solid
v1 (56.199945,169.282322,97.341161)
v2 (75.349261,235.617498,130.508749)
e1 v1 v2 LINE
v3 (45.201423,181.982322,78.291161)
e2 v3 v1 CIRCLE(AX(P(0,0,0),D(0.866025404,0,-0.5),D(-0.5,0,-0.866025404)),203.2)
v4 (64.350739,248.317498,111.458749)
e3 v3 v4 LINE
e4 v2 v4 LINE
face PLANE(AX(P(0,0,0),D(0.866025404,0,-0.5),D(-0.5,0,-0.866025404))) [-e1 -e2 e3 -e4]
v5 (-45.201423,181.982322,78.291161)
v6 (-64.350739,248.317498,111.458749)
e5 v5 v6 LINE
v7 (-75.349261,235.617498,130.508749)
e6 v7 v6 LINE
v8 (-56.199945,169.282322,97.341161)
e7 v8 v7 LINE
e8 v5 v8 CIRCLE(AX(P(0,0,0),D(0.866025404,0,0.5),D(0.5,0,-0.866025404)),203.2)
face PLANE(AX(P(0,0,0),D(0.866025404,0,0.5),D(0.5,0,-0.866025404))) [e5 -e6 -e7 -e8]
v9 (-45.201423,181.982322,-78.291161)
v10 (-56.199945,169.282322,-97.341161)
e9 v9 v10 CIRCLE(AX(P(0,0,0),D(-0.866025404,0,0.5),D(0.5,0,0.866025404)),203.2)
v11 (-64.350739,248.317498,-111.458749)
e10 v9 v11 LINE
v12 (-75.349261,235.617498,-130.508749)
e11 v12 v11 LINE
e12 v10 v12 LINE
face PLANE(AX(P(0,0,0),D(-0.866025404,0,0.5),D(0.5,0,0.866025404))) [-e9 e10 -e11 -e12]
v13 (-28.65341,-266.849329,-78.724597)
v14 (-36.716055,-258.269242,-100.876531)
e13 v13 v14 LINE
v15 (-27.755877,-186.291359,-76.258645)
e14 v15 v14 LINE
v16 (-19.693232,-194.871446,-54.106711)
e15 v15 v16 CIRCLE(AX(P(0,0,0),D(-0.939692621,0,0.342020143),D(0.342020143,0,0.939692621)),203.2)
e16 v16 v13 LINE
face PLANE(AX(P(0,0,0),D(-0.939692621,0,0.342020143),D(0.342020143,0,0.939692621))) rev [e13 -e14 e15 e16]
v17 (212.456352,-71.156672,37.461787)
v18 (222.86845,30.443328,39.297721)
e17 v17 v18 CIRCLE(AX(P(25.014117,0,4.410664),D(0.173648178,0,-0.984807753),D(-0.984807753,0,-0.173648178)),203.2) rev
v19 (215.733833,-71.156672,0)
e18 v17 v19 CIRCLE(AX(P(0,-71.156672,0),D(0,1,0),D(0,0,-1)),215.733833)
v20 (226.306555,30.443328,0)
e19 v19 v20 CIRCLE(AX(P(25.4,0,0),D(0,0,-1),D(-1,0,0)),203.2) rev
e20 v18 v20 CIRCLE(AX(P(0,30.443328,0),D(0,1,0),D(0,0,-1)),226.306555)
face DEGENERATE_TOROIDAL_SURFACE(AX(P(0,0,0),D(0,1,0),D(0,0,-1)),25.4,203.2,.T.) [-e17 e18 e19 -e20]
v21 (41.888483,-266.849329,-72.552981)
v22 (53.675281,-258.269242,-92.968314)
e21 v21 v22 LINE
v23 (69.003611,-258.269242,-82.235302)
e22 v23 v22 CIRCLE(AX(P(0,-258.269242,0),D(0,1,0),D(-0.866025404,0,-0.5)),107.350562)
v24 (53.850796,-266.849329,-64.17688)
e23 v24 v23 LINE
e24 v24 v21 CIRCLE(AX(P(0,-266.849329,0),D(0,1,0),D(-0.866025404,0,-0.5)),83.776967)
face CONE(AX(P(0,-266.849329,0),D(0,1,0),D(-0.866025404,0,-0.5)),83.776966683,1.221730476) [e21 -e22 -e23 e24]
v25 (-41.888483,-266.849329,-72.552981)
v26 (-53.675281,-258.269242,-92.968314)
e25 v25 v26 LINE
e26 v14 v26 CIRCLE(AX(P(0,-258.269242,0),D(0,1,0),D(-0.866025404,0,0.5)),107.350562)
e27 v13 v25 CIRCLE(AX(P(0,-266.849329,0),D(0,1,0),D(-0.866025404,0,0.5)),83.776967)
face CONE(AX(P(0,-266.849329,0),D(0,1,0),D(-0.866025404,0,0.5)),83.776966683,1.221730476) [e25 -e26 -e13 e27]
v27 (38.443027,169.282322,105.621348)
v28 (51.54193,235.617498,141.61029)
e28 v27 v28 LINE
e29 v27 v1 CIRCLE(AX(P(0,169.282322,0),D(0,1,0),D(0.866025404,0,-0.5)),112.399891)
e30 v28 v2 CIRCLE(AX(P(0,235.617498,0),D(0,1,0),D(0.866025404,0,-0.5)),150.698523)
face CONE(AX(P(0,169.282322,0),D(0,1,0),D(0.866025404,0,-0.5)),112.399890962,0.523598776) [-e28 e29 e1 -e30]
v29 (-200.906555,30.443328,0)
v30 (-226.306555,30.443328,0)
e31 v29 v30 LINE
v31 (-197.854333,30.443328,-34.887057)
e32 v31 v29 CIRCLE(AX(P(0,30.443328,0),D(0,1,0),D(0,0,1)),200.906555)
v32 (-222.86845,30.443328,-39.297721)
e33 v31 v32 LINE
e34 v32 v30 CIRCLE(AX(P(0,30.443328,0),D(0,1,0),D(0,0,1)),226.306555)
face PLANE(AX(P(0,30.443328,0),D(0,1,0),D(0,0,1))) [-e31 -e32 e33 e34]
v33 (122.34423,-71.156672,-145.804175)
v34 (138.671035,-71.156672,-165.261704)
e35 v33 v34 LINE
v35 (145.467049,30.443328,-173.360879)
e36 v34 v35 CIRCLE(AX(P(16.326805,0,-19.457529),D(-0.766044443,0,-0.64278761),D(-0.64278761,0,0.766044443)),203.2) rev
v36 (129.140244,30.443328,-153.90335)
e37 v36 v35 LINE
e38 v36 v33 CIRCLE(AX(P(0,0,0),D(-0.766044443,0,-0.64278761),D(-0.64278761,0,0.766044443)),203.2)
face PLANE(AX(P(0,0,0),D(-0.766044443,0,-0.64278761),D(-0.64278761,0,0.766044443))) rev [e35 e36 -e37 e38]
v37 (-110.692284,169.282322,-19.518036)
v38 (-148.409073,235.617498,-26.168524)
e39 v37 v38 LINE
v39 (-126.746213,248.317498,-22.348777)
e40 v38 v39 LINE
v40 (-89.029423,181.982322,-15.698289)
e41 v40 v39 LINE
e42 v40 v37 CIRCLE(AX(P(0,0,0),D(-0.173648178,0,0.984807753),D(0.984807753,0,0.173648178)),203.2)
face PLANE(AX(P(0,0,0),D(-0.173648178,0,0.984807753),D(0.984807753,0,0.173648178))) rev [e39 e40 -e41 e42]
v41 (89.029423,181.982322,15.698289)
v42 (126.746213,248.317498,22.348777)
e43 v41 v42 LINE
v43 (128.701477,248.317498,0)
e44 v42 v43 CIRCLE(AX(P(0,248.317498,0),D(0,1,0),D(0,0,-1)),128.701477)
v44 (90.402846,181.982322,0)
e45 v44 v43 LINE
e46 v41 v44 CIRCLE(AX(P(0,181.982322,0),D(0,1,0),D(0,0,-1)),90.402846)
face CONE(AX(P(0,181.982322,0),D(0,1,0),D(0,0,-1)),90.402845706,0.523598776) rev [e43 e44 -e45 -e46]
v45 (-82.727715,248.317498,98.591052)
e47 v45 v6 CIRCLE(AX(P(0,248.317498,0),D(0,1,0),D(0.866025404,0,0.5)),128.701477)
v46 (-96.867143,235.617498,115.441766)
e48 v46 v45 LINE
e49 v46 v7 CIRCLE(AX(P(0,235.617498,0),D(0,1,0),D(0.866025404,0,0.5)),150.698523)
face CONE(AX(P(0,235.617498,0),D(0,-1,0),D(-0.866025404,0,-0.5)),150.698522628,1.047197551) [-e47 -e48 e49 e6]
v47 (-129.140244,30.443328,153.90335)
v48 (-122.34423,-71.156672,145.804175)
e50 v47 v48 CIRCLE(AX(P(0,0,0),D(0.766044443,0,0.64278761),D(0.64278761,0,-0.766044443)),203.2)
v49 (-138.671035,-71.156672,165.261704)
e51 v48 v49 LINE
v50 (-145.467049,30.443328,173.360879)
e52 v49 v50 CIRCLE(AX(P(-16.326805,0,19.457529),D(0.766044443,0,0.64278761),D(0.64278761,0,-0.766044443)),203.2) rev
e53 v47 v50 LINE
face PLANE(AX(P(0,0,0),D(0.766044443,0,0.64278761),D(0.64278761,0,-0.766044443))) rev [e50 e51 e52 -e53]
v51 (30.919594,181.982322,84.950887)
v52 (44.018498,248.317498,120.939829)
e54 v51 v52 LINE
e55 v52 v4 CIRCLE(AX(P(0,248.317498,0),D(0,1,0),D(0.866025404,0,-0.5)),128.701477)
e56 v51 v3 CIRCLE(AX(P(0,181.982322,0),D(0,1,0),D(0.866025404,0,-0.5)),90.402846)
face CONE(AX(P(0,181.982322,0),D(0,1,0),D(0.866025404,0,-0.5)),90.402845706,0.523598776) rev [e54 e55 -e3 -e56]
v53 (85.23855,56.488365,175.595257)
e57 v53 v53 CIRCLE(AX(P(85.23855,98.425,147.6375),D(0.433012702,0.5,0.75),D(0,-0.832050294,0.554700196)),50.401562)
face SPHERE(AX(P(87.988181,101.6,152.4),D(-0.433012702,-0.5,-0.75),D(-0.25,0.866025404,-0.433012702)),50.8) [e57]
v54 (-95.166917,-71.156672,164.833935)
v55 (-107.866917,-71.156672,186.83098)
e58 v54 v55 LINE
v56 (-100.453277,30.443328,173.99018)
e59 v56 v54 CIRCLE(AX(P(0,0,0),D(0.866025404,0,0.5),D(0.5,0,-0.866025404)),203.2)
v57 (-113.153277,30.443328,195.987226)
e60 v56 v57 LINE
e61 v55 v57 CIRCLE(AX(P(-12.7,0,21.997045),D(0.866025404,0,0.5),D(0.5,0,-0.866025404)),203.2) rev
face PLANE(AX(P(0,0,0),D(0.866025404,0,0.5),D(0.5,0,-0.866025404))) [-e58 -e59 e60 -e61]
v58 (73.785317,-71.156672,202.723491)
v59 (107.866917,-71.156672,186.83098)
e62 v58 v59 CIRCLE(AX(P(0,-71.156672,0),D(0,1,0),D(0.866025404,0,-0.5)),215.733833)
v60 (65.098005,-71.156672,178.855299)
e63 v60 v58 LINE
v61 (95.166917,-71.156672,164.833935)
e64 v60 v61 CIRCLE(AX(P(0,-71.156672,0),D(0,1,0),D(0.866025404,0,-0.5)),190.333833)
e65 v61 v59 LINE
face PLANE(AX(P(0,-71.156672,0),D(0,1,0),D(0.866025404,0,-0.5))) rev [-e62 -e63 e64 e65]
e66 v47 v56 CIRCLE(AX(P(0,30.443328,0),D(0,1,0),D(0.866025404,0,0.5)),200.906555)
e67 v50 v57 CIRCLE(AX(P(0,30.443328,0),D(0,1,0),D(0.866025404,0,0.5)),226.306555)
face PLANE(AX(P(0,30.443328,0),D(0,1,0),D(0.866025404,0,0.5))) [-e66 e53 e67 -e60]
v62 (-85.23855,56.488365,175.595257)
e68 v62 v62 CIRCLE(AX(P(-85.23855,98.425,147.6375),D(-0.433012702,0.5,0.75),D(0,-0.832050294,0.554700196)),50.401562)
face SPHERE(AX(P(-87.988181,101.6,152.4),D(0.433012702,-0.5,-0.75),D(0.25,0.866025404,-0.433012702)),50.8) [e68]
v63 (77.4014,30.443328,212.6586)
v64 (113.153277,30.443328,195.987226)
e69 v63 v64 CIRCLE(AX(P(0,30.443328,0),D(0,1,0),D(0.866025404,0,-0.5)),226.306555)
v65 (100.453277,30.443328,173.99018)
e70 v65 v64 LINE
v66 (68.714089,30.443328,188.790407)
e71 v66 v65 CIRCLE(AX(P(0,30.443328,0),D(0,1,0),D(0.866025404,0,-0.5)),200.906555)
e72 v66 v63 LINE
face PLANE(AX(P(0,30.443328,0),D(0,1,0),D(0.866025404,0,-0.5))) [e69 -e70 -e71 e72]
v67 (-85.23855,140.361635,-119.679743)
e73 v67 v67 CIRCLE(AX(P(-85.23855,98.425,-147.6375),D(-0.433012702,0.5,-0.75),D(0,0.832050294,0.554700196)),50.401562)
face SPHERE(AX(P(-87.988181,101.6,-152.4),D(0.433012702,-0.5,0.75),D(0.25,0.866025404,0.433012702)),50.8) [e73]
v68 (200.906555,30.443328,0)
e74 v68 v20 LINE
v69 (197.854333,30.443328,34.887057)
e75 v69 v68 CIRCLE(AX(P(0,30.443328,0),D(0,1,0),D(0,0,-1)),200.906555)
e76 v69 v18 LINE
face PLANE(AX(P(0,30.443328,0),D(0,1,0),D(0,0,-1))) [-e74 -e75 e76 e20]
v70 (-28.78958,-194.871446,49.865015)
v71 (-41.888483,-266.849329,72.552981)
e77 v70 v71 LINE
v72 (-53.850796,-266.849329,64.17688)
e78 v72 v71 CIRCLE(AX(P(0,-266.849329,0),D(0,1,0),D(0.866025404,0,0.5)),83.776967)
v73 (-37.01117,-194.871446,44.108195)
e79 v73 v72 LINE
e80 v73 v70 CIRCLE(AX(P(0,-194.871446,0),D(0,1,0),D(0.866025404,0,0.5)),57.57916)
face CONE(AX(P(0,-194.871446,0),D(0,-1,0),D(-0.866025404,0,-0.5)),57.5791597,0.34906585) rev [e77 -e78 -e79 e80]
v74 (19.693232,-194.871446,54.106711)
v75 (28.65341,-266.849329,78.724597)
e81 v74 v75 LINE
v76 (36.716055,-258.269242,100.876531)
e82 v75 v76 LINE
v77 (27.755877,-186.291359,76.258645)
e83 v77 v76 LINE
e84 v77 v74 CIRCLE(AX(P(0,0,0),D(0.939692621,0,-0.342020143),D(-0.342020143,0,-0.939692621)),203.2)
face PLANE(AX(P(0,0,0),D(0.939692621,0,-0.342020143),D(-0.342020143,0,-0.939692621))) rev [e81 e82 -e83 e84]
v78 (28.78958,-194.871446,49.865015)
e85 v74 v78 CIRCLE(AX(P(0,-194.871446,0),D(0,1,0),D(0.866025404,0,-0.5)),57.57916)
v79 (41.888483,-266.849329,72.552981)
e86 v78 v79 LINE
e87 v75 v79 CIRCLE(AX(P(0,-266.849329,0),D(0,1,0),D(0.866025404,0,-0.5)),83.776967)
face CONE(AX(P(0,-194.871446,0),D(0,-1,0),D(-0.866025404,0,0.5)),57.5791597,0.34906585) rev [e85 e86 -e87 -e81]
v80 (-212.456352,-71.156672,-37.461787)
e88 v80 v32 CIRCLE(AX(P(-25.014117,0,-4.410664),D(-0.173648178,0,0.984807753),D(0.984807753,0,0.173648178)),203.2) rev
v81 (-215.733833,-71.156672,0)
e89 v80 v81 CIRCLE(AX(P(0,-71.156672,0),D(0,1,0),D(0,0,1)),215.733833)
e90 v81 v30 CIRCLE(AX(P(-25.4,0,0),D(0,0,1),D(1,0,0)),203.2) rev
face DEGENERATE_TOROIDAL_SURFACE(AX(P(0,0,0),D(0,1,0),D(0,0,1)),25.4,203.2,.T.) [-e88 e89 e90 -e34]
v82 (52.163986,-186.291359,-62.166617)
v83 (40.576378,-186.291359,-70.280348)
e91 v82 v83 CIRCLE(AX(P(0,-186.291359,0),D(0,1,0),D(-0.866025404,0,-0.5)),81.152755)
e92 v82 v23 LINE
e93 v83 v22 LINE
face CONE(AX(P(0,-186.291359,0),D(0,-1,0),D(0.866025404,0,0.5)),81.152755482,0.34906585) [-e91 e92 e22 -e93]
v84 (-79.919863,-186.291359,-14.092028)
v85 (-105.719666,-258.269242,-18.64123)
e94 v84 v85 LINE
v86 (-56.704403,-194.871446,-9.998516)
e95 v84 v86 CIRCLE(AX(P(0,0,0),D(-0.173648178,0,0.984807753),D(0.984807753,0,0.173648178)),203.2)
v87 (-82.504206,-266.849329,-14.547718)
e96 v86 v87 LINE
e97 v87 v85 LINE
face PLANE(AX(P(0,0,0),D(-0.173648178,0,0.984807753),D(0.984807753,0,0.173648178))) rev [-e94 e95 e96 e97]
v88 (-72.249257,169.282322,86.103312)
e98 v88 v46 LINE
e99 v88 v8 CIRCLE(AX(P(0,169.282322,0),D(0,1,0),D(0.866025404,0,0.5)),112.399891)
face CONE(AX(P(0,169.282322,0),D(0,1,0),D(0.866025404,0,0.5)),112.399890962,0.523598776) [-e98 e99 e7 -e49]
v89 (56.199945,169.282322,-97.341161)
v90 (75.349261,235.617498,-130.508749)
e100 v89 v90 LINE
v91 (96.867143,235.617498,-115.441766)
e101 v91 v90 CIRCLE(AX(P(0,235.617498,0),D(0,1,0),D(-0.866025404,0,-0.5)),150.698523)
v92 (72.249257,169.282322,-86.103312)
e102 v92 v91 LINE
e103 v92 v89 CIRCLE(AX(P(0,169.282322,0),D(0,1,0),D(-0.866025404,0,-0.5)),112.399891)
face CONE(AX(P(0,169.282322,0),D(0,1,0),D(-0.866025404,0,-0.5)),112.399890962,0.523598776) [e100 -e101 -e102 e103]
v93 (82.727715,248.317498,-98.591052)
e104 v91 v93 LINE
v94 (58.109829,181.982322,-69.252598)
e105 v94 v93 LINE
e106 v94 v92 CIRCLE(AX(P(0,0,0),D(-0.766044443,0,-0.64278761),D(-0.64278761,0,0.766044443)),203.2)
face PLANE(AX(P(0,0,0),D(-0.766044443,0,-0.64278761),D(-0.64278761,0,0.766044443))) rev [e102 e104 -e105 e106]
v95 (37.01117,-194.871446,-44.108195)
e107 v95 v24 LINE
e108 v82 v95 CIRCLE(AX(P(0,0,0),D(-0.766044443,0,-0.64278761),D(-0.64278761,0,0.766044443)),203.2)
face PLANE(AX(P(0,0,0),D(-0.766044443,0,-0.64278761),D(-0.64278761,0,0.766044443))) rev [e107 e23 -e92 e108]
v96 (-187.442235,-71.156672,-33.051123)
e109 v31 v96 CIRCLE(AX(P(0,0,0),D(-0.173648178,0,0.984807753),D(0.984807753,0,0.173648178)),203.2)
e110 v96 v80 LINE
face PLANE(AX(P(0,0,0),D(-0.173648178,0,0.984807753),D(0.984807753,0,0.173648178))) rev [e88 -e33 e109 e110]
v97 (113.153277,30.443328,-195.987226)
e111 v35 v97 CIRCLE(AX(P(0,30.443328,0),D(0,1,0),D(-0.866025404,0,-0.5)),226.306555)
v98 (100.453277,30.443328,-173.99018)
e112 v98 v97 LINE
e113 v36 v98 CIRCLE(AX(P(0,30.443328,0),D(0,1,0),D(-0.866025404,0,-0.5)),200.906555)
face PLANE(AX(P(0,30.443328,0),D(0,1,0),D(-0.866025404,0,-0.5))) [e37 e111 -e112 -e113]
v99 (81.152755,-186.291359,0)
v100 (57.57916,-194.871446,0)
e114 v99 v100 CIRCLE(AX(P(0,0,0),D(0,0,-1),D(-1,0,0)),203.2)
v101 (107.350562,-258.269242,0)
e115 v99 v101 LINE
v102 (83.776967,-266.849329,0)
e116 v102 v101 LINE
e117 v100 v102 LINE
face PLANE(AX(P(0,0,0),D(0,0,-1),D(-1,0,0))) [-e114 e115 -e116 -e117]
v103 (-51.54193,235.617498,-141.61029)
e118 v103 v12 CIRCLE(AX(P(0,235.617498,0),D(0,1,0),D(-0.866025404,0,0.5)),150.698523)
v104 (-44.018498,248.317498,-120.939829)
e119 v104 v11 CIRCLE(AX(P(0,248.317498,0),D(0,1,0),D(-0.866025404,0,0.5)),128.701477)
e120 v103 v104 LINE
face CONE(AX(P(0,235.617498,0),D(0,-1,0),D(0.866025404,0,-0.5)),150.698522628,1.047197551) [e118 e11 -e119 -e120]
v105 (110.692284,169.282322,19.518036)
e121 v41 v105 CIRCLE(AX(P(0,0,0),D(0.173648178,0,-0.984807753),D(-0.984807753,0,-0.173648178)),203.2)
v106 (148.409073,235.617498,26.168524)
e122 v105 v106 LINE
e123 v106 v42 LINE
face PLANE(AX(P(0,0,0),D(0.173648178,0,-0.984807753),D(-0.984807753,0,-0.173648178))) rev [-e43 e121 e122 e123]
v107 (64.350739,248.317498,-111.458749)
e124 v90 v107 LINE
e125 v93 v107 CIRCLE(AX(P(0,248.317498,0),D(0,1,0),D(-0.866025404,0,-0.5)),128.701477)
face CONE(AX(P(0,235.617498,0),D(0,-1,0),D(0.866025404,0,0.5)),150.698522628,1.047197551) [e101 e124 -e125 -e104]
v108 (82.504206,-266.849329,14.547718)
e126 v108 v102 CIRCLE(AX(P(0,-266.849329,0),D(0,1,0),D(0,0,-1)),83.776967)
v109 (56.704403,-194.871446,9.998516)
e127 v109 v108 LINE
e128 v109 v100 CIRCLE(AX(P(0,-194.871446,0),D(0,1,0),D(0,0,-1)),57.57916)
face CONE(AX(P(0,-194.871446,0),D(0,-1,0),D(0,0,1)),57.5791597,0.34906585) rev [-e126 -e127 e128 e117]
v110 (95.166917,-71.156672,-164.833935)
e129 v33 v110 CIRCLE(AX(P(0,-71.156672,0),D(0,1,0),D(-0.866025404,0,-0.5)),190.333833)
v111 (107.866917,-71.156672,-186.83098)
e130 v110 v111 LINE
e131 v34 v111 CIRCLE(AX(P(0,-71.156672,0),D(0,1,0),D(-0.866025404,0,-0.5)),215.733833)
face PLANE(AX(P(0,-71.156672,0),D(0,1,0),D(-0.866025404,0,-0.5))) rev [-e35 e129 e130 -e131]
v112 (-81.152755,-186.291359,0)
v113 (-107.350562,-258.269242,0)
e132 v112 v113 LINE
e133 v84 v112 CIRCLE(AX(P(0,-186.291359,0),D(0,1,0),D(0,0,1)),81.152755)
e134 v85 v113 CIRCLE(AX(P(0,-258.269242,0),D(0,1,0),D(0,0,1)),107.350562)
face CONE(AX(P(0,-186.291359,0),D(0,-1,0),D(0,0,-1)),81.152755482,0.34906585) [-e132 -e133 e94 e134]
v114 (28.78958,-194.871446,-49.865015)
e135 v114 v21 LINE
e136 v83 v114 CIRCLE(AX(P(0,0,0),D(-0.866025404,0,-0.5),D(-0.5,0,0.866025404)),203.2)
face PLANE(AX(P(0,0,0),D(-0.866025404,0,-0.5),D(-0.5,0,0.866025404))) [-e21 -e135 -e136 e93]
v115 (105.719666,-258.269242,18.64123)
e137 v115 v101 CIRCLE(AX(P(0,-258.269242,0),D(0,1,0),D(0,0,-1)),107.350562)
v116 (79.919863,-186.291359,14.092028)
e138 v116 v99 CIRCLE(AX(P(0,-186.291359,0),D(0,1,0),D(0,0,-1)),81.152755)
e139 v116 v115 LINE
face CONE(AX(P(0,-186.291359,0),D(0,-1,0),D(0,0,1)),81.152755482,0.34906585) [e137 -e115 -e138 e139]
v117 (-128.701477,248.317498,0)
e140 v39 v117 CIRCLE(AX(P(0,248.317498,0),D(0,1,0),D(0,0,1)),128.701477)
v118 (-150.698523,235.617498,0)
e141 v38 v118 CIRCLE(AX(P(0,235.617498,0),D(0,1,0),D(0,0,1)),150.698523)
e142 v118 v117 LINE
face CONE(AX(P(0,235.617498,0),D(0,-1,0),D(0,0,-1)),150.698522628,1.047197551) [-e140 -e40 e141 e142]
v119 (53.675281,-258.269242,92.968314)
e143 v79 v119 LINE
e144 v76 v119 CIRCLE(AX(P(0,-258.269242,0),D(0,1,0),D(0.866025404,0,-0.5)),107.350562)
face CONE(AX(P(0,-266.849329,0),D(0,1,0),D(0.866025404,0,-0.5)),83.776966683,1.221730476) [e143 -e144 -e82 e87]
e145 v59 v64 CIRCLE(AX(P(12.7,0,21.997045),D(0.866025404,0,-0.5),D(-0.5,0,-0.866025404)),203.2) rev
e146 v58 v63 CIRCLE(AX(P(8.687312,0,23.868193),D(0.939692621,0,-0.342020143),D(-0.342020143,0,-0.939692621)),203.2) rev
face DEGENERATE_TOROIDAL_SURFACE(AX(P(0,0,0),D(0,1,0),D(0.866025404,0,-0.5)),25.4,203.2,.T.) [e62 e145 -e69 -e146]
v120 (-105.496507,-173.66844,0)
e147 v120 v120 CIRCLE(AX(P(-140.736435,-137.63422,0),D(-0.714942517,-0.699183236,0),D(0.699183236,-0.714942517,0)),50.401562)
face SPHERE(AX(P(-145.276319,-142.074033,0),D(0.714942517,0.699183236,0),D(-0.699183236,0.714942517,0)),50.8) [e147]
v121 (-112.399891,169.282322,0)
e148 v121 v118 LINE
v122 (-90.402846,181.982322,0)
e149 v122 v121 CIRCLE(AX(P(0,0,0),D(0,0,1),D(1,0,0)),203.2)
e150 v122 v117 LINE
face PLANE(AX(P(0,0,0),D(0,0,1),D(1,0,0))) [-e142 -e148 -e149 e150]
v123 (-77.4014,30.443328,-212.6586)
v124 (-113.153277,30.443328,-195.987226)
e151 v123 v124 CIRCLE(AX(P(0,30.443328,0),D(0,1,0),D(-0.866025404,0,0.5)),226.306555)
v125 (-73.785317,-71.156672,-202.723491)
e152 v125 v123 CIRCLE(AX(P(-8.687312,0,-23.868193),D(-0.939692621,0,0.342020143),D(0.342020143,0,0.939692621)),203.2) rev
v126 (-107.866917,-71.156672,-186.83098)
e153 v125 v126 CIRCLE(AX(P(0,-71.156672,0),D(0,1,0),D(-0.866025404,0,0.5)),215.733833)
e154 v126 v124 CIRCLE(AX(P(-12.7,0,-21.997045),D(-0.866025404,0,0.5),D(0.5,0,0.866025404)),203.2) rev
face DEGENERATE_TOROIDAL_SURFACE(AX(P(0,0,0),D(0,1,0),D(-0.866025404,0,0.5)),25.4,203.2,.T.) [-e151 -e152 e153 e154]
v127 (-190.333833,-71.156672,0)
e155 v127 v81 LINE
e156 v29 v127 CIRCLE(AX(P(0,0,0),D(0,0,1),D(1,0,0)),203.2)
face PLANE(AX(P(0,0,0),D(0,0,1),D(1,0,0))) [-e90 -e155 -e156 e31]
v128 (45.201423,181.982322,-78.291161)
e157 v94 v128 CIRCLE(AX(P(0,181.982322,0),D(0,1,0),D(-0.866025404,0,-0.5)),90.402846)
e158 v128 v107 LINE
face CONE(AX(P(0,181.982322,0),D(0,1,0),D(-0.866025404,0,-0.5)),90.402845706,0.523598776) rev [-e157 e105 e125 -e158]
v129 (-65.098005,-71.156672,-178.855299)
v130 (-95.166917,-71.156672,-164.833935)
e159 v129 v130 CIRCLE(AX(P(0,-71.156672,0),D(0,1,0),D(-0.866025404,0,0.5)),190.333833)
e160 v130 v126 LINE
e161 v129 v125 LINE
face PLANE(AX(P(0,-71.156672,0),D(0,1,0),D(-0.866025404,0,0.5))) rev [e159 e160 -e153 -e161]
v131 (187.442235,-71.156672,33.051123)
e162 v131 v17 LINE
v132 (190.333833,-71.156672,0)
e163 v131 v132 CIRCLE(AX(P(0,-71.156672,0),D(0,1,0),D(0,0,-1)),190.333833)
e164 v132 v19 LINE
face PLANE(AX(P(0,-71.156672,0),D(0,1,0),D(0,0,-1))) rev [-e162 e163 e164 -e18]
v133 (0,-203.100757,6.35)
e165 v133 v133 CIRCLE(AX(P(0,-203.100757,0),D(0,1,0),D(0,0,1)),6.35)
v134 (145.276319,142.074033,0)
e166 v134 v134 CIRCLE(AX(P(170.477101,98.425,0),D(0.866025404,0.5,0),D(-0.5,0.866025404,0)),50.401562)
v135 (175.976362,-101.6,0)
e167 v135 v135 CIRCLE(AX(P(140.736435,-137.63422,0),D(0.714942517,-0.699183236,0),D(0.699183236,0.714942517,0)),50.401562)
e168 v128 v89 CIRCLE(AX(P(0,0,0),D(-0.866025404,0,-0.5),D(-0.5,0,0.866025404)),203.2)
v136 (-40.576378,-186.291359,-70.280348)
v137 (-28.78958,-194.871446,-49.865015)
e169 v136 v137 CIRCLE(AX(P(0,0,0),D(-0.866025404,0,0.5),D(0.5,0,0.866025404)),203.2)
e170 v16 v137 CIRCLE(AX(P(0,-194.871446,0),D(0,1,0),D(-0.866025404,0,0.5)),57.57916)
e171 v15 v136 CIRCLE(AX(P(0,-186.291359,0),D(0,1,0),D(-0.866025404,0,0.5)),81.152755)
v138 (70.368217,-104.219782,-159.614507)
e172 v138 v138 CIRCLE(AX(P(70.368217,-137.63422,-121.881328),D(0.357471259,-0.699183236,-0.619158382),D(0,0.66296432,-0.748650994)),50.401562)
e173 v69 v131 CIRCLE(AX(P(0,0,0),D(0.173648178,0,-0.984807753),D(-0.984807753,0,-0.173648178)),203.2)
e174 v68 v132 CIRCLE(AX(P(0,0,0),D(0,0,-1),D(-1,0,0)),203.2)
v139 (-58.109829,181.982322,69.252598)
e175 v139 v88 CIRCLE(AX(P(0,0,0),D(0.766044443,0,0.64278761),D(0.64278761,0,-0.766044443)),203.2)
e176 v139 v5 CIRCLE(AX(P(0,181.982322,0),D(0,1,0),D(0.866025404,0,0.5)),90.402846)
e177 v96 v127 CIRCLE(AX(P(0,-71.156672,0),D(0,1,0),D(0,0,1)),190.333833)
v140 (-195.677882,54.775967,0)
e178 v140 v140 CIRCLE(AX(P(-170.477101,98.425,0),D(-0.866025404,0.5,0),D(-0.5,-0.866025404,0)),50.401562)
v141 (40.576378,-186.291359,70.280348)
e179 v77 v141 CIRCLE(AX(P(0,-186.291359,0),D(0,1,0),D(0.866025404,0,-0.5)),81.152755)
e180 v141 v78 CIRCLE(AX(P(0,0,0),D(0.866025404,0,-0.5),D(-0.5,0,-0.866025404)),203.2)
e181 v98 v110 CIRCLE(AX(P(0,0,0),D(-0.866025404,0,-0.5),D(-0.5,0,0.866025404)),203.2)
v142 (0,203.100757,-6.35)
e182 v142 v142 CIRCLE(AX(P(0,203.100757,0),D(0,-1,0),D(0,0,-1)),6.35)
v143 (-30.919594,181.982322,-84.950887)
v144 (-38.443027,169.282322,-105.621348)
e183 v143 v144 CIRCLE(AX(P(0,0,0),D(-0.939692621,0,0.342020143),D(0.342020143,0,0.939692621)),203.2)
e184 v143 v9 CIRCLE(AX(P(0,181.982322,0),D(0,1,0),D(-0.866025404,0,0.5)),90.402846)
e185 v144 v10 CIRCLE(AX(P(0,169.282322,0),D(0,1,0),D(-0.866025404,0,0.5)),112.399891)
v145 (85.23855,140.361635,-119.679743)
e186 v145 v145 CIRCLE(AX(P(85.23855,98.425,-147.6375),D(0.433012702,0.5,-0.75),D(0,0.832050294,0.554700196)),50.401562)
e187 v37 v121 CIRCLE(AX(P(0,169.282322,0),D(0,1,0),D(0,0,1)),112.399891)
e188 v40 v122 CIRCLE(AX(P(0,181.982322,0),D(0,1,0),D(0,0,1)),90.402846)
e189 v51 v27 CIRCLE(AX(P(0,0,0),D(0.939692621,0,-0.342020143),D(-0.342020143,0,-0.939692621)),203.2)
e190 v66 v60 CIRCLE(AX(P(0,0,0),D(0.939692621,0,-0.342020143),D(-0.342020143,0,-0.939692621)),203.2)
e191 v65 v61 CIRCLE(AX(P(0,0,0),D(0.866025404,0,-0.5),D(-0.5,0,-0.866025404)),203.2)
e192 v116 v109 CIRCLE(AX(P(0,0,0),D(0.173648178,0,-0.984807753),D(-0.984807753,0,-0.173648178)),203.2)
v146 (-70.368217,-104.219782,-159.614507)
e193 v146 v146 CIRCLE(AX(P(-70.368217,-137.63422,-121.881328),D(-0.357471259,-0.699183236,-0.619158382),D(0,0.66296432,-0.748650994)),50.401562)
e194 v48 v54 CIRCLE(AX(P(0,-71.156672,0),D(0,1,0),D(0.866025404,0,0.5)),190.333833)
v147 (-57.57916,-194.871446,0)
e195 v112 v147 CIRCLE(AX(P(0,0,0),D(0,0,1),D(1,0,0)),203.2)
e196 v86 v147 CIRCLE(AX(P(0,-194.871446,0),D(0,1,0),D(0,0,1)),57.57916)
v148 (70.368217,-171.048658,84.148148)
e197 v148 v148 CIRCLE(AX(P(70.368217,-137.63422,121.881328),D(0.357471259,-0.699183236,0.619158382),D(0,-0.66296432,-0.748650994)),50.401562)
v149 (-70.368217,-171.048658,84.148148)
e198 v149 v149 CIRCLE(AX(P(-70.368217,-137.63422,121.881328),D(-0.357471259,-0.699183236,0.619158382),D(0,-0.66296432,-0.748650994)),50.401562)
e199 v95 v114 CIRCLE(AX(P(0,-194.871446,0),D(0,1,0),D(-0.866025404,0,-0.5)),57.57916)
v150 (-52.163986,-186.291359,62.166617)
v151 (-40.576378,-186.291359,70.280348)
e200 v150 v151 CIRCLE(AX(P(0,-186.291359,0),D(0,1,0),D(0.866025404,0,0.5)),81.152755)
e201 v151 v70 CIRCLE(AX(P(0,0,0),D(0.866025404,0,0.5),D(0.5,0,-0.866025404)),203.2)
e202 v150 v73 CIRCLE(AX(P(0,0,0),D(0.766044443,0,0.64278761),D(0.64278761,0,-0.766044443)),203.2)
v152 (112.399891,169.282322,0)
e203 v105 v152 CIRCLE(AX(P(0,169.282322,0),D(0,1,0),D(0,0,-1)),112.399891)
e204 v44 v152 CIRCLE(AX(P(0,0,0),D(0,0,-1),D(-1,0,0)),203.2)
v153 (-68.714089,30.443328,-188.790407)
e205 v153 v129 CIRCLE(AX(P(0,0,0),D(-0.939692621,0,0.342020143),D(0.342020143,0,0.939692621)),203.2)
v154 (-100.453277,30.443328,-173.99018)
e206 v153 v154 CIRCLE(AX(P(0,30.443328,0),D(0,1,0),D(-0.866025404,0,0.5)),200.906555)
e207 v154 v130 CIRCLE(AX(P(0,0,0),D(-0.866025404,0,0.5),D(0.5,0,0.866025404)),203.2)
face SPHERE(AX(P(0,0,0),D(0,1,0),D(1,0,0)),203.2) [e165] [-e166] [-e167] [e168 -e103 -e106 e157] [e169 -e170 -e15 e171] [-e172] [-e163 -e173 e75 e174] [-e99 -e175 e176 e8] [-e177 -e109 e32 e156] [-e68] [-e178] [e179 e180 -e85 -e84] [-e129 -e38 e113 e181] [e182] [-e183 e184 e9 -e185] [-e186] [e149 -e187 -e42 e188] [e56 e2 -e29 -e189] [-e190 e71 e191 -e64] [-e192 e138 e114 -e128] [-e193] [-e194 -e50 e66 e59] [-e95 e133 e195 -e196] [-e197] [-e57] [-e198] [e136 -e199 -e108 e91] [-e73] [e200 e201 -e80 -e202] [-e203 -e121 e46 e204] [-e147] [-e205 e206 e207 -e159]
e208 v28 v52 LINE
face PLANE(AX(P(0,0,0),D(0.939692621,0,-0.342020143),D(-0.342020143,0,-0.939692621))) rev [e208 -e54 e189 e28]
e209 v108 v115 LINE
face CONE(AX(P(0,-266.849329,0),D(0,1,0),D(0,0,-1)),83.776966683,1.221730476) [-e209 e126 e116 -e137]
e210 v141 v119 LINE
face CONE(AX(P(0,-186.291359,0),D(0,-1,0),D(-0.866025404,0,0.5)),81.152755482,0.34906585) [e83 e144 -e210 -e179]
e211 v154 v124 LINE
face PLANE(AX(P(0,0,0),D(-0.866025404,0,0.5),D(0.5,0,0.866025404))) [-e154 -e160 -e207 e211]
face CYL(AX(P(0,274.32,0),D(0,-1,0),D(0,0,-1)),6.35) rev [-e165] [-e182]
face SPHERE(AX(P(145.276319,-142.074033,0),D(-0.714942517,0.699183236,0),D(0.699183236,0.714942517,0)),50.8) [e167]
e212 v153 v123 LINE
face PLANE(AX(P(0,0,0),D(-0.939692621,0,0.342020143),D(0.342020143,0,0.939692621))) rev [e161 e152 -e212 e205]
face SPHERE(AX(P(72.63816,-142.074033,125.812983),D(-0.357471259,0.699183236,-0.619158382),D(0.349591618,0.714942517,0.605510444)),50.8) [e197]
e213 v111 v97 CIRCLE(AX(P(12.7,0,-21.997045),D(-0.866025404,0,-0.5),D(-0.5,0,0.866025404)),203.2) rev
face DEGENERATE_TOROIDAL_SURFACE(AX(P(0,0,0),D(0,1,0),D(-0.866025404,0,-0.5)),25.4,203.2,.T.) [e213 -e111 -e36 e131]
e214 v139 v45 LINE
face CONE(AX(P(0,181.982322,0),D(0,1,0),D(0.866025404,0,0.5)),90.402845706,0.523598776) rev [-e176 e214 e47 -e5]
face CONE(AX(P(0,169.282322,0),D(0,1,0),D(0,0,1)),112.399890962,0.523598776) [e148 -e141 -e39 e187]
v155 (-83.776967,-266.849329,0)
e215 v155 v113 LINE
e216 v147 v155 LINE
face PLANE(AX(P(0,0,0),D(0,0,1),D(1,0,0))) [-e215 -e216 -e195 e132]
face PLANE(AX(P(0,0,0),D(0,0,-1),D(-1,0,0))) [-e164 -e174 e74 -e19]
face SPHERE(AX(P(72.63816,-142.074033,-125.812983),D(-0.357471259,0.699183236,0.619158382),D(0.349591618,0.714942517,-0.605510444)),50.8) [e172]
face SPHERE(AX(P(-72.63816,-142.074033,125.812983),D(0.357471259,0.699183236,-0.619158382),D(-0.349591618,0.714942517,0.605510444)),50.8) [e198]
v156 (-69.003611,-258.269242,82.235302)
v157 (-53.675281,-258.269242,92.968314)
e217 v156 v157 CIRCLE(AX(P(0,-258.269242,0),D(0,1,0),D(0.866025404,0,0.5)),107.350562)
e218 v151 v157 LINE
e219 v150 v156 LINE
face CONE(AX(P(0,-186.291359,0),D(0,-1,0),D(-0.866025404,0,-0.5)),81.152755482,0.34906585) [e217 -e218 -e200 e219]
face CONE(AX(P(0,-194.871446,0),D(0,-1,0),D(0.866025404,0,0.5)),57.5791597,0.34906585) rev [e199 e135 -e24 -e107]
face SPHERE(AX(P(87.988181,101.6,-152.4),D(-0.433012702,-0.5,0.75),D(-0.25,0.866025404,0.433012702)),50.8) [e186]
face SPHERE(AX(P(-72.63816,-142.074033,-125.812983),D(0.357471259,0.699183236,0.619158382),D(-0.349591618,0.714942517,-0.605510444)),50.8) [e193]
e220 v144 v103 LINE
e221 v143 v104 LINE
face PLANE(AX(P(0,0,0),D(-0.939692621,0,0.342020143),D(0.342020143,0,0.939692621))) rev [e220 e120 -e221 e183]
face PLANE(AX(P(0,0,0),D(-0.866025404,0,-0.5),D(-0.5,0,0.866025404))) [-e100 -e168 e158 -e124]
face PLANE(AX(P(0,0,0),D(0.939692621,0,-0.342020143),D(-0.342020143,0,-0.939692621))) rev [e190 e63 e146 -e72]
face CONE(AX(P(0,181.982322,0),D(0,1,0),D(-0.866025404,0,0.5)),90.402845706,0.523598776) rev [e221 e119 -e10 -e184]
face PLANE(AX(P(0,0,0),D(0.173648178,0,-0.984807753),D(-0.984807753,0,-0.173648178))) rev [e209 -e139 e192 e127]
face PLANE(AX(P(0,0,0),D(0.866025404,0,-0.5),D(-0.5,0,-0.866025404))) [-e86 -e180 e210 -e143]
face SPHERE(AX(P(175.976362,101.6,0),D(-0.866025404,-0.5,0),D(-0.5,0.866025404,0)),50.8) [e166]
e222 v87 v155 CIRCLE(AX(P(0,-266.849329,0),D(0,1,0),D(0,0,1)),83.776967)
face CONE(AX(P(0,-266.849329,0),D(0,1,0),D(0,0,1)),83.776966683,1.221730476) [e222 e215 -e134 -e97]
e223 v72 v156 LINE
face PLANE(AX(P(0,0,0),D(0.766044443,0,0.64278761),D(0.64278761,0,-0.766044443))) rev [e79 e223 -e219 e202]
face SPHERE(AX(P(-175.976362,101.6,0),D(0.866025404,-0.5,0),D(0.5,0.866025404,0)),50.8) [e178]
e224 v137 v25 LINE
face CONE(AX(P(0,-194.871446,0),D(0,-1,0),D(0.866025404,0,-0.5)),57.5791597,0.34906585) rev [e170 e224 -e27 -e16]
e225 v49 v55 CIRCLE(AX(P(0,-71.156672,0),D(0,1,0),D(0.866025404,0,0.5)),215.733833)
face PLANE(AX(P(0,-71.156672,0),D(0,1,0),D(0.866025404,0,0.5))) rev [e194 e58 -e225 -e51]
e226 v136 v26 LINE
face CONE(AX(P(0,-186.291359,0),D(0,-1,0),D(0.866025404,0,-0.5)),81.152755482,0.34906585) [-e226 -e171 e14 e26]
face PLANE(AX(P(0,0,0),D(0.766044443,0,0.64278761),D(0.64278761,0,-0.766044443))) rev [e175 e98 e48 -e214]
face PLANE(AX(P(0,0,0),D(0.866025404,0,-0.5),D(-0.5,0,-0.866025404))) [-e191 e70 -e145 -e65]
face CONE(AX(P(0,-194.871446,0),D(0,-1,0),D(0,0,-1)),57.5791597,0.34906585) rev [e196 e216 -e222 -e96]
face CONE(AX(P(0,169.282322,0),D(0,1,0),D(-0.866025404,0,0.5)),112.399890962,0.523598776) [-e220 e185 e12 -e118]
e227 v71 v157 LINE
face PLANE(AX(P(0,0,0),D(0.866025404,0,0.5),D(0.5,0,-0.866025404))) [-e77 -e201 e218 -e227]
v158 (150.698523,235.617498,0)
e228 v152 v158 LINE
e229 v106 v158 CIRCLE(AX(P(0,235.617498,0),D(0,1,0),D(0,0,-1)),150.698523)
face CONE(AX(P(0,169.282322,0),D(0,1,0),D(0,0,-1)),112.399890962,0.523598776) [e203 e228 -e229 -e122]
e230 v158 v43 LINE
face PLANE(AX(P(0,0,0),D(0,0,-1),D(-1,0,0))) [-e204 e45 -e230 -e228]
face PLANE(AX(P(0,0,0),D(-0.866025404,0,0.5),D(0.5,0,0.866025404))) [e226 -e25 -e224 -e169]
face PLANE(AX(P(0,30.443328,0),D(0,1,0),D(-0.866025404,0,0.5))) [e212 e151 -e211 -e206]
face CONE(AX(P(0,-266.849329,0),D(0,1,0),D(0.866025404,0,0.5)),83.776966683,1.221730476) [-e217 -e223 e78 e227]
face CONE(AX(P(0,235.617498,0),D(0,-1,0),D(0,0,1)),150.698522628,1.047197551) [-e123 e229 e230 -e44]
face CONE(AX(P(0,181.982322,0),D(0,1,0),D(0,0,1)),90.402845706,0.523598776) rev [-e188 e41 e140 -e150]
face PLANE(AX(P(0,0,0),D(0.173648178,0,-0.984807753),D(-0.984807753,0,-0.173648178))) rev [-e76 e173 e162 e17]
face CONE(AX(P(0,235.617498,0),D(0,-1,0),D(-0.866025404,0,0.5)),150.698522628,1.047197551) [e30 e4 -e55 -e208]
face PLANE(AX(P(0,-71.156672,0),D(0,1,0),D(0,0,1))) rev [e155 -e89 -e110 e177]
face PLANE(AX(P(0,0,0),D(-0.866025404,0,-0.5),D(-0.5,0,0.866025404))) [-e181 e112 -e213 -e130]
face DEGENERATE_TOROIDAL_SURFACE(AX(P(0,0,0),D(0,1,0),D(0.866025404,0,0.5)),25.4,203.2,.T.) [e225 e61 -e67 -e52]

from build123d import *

# Parameters (mm, degrees)
CUT_EXTRUDE1_DEPTH      = 274.32
CUT_EXTRUDE1_DEPTH_BACK = 255.524
SKETCH2_R               = 6.35
REVOLVE2_ANGLE          = 10
CIRPATTERN1_COUNT       = 6


with BuildPart() as part:
    # Sketch1 → Revolve1 (revolve)
    with BuildSketch(Plane.XY):
        with BuildLine():
            Line((0, -203.2), (0, 203.2))
            ThreePointArc((0, 203.2), (-46.429689788, 197.82447752), (-90.402845706, 181.982321911))
            ThreePointArc((-90.402845706, 181.982321911), (-101.6, 175.976362049), (-112.399890962, 169.282321911))
            ThreePointArc((-112.399890962, 169.282321911), (-129.55435191, 156.543635774), (-145.276319497, 142.074033494))
            ThreePointArc((-145.276319497, 142.074033494), (-161.896133978, 122.800170208), (-175.976362049, 101.6))
            ThreePointArc((-175.976362049, 101.6), (-187.296133978, 78.806079695), (-195.677881973, 54.775966506))
            ThreePointArc((-195.677881973, 54.775966506), (-198.665103115, 42.689774003), (-200.906554809, 30.443328247))
            ThreePointArc((-200.906554809, 30.443328247), (-202.108634909, -21.031873321), (-190.333833211, -71.156671753))
            ThreePointArc((-190.333833211, -71.156671753), (-183.786530645, -86.676127933), (-175.976362049, -101.6))
            ThreePointArc((-175.976362049, -101.6), (-161.896133978, -122.800170208), (-145.276319497, -142.074033494))
            ThreePointArc((-145.276319497, -142.074033494), (-126.377625604, -159.119250082), (-105.496506977, -173.668439896))
            ThreePointArc((-105.496506977, -173.668439896), (-93.537806864, -180.391016093), (-81.152755482, -186.29135857))
            ThreePointArc((-81.152755482, -186.29135857), (-69.498493124, -190.945540544), (-57.5791597, -194.871445749))
            ThreePointArc((-57.5791597, -194.871445749), (-29.089192356, -201.107083138), (0, -203.2))
        make_face()
    revolve(axis=Axis((0, 203.2, 0), (0, -1, 0)))

    # Sketch2 → Cut-Extrude1 (cut, two sides: drawn at the far end of the back side and taken through both)
    with BuildSketch(Plane(origin=(0, 0, 0), x_dir=(1, 0, 0), z_dir=(0, 1, 0)).offset(-CUT_EXTRUDE1_DEPTH_BACK)):
        Circle(SKETCH2_R)
    extrude(amount=CUT_EXTRUDE1_DEPTH + CUT_EXTRUDE1_DEPTH_BACK, mode=Mode.SUBTRACT)

    # Sketch1<4> → Revolve2 (revolve)
    with BuildSketch(Plane.XY):
        with BuildLine():
            ThreePointArc((-112.399890962, 169.282321911), (-101.6, 175.976362049), (-90.402845706, 181.982321911))
            Line((-90.402845706, 181.982321911), (-128.701477372, 248.317497817))
            Line((-128.701477372, 248.317497817), (-150.698522628, 235.617497817))
            Line((-150.698522628, 235.617497817), (-112.399890962, 169.282321911))
        make_face()
        with BuildLine():
            Line((-83.776966683, -266.849328874), (-57.5791597, -194.871445749))
            ThreePointArc((-57.5791597, -194.871445749), (-69.498493124, -190.945540544), (-81.152755482, -186.29135857))
            Line((-81.152755482, -186.29135857), (-107.350562465, -258.269241695))
            Line((-107.350562465, -258.269241695), (-83.776966683, -266.849328874))
        make_face()
        with BuildLine():
            ThreePointArc((-190.333833211, -71.156671753), (-202.108634909, -21.031873321), (-200.906554809, 30.443328247))
            Line((-200.906554809, 30.443328247), (-226.306554809, 30.443328247))
            ThreePointArc((-226.306554809, 30.443328247), (-227.508634909, -21.031873321), (-215.733833211, -71.156671753))
            Line((-215.733833211, -71.156671753), (-190.333833211, -71.156671753))
        make_face()
    revolve2 = revolve(axis=Axis((0, 203.2, 0), (0, -1, 0)), revolution_arc=REVOLVE2_ANGLE)

    # Sketch1<6> → Revolve4 (revolve)
    with BuildSketch(Plane.XY):
        with BuildLine():
            ThreePointArc((-175.976362049, 101.6), (-161.896133978, 122.800170208), (-145.276319497, 142.074033494))
            ThreePointArc((-145.276319497, 142.074033494), (-186.025717712, 151.396088709), (-219.970452561, 127))
            Line((-219.970452561, 127), (-175.976362049, 101.6))
        make_face()
    revolve4 = revolve(axis=Axis((0, 0, 0), (-0.8660254037844364, 0.500000000000004, 0)))

    # Sketch1<11> → Revolve10 (revolve)
    with BuildSketch(Plane.XY):
        with BuildLine():
            Line((-181.595399371, -177.592541868), (-145.276319497, -142.074033494))
            ThreePointArc((-145.276319497, -142.074033494), (-161.896133978, -122.800170208), (-175.976362049, -101.6))
            ThreePointArc((-175.976362049, -101.6), (-195.938014076, -138.328008613), (-181.595399371, -177.592541868))
        make_face()
    revolve10 = revolve(axis=Axis((0, 0, 0), (-0.7149425172100239, -0.6991832357010533, 0)))

    # CirPattern1: Revolve2, Revolve4, Revolve10 ×6 about axis
    cirpattern1_axis = Axis((0, 0, 0), (0, 1, 0))
    add([revolve2.rotate(cirpattern1_axis, i * 360 / CIRPATTERN1_COUNT) for i in range(1, CIRPATTERN1_COUNT)])
    add([revolve4.rotate(cirpattern1_axis, i * 360 / CIRPATTERN1_COUNT) for i in range(1, CIRPATTERN1_COUNT)])
    add([revolve10.rotate(cirpattern1_axis, i * 360 / CIRPATTERN1_COUNT) for i in range(1, CIRPATTERN1_COUNT)])


solid = part.part
